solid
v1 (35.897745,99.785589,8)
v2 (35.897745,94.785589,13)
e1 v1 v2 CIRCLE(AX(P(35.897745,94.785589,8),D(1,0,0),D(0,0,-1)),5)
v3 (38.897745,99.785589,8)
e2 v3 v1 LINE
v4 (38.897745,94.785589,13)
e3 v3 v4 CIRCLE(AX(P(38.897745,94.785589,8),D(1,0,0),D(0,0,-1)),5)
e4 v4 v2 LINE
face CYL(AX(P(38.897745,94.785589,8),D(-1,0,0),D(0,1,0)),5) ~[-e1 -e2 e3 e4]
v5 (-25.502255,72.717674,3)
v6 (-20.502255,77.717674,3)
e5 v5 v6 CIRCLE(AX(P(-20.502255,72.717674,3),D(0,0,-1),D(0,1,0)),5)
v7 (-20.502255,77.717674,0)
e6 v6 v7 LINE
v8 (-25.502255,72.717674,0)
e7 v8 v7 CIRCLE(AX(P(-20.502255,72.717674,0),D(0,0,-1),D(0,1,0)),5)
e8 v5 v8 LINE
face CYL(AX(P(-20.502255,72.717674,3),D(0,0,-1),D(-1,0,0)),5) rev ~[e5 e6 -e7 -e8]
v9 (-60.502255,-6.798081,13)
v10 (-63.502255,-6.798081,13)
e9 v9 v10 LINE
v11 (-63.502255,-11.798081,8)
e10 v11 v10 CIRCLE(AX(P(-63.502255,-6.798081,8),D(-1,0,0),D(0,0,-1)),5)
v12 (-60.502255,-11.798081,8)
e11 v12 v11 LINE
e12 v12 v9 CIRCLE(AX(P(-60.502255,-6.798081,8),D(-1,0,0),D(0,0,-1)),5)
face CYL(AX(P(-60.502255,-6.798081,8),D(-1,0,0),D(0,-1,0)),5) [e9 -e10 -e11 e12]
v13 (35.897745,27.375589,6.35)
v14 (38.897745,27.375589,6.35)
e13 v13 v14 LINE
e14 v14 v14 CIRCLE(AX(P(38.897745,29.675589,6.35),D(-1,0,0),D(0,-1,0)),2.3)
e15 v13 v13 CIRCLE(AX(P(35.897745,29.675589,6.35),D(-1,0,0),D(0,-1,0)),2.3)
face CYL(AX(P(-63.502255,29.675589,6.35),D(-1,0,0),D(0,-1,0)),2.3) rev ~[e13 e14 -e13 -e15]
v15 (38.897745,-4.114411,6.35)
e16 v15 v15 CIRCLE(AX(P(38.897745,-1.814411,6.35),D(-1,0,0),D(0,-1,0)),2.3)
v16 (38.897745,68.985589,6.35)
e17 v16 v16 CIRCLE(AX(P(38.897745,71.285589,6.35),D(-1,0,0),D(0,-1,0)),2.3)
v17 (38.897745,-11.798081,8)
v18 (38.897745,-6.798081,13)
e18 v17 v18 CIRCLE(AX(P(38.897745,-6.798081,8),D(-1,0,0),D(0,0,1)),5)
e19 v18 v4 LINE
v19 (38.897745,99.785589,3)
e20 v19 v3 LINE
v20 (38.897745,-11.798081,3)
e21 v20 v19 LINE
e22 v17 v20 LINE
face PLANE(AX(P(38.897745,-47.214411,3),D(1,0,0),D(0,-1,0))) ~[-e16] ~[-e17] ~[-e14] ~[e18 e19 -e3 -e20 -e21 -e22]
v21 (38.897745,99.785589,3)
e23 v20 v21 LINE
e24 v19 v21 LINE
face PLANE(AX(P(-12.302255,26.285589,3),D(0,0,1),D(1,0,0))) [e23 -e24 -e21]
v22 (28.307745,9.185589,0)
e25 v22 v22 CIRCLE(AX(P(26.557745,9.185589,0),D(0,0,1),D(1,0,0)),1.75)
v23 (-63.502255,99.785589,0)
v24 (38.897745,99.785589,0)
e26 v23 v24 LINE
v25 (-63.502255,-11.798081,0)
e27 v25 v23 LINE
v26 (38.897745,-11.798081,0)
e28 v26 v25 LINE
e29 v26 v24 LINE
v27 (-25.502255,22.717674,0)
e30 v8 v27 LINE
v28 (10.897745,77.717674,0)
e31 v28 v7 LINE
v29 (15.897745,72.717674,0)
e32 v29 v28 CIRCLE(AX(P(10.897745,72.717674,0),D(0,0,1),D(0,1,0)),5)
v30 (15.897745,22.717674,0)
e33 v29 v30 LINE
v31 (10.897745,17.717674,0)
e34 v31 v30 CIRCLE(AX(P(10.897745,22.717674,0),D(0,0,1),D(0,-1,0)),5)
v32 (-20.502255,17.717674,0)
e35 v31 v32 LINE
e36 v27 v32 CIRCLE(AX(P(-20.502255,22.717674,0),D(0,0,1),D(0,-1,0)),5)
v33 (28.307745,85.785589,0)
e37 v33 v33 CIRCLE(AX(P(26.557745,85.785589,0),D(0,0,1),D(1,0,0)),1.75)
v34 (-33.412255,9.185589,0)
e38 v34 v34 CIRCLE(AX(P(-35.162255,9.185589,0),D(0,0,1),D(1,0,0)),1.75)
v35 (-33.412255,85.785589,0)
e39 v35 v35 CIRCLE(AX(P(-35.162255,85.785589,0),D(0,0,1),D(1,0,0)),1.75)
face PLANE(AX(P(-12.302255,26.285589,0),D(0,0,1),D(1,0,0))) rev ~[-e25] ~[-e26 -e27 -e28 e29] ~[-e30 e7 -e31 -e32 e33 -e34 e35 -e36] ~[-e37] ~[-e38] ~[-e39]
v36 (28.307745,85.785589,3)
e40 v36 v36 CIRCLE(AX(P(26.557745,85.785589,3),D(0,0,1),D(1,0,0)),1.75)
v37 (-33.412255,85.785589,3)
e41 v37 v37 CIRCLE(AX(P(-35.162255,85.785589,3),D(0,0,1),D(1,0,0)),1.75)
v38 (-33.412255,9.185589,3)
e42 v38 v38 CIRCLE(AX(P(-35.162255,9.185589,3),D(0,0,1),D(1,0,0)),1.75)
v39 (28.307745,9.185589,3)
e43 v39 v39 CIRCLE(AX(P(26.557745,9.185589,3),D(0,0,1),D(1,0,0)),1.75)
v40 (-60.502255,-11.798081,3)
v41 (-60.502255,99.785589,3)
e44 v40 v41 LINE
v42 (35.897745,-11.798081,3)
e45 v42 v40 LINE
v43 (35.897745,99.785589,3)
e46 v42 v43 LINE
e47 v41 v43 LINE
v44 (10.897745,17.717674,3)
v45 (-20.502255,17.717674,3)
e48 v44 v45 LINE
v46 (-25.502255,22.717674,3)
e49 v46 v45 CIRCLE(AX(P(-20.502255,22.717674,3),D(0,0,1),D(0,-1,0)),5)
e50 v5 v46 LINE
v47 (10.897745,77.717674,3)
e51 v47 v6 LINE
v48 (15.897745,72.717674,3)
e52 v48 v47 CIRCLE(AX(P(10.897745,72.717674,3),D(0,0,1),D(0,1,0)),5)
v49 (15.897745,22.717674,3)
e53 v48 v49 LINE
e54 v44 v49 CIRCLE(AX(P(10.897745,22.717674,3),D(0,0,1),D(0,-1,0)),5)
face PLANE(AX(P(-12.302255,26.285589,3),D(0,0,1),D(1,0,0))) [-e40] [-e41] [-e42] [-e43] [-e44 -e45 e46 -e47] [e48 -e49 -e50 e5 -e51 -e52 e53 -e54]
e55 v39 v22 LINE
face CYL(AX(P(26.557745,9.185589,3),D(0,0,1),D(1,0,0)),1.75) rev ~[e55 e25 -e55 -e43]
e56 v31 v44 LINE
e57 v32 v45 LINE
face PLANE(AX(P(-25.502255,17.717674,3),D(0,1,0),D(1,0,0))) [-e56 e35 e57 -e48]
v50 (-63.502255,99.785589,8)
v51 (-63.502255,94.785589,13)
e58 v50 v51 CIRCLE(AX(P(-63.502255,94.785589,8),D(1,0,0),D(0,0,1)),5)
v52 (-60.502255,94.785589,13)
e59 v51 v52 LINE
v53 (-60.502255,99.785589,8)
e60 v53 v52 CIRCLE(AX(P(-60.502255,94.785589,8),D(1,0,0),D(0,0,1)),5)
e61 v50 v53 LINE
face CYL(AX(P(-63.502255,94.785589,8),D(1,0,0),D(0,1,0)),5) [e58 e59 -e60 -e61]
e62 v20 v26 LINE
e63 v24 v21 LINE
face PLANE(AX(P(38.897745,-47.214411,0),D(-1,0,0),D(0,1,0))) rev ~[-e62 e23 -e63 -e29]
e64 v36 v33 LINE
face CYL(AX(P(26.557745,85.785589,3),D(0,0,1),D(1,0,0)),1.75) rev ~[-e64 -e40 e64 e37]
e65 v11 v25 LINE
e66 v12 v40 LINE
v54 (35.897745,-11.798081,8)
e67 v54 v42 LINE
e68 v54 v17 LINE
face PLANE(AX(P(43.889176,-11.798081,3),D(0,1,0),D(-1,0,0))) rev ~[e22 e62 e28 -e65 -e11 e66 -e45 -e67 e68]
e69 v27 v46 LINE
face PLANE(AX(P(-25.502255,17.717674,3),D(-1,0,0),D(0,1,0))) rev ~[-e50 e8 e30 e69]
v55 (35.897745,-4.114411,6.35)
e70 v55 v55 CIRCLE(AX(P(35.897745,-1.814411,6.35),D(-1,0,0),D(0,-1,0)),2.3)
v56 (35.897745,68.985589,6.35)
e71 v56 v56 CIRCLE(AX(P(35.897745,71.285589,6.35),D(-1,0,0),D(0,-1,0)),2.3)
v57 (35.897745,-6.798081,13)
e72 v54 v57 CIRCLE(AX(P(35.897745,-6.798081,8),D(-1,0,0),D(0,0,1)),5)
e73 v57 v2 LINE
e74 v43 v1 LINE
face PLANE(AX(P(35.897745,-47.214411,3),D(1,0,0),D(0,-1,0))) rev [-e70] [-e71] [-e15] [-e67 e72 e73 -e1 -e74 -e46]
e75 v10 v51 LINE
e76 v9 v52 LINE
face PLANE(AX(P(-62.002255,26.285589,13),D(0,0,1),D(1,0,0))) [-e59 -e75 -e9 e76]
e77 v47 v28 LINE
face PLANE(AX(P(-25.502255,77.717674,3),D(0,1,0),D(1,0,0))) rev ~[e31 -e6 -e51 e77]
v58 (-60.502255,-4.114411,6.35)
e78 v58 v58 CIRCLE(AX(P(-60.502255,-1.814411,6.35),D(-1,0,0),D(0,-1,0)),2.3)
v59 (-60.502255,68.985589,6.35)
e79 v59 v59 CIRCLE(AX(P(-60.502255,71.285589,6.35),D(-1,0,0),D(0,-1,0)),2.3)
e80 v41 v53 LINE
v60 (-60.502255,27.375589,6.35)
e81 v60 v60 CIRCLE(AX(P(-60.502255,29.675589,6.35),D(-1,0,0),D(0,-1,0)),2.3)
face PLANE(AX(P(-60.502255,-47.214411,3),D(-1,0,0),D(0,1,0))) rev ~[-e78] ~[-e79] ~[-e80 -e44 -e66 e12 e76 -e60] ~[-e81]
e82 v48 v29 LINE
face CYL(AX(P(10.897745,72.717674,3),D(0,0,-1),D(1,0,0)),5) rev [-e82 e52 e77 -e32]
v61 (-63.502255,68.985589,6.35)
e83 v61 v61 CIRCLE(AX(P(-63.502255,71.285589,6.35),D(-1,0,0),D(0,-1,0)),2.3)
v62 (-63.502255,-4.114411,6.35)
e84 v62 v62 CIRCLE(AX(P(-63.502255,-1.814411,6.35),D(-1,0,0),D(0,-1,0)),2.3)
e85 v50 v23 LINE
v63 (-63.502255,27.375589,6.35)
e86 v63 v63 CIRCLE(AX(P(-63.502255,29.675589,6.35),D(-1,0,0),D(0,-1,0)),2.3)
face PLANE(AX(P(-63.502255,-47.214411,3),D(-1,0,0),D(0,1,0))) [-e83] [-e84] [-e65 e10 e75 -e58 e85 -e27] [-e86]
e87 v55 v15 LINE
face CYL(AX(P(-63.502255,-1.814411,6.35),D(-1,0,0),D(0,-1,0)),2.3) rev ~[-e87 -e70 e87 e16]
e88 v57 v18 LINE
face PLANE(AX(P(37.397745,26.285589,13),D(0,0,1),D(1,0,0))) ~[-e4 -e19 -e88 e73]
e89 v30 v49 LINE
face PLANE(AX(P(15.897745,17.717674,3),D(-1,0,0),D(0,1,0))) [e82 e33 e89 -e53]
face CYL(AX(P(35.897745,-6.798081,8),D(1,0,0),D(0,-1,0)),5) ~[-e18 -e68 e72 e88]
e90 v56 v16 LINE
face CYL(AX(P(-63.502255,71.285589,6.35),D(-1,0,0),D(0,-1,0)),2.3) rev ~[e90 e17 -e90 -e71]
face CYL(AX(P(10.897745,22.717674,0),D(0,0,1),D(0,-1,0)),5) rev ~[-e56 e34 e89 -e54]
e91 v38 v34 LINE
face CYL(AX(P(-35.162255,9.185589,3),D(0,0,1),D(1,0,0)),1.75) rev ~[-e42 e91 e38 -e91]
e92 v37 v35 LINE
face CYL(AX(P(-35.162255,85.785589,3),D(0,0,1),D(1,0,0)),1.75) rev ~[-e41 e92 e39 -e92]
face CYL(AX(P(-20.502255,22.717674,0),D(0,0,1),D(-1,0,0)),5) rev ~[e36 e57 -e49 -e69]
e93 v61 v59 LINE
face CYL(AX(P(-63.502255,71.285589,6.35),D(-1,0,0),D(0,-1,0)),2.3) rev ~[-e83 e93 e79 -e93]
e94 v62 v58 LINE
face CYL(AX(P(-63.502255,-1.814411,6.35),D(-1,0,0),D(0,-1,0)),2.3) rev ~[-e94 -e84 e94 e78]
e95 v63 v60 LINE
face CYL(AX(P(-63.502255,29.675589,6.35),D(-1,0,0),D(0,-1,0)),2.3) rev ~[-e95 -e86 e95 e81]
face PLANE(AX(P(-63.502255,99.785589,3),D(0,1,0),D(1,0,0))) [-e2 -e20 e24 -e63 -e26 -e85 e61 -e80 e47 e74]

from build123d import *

# Parameters (mm, degrees)
F0_W      = 102.4
F0_H      = 147
F1_DEPTH  = 3
F2_W      = 3
F2_H      = 147
F3_DEPTH  = 10
F5_R      = 2.3
F6_DEPTH  = 102.401
F7_R      = 1.75
F8_DEPTH  = 3.001
F9_W      = 41.4
F9_H      = 60
F9_W_2    = 96.3999993775
F9_H_2    = 35.4163302109
F10_DEPTH = 12.5
F11_R     = 5


# Not quite as in the source:
# - a pattern or mirror of a feature is missing from the dataset's text; its kind, count and spacing are read off the source's solid
# - a feature names something its author has since deleted; it is built from what else it names


with BuildPart() as f1:
    # F0 (on Top) → F1 (new body)
    with BuildSketch(Plane.XY):
        with Locations((-12.3022546887, 26.2855888009)):
            Rectangle(F0_W, F0_H)
    extrude(amount=F1_DEPTH)

    # F2 (on face) → F3 (join)
    with BuildSketch(Plane.XY.offset(3)):
        with Locations((-62.0022546887, 26.2855888009)):
            Rectangle(F2_W, F2_H)
    f3 = extrude(amount=F3_DEPTH)

    # F3_copies: F3 across plane
    add(f3.mirror(Plane(origin=(-12.302255, 0, 0), x_dir=(0, 0, 1), z_dir=(1, 0, 0))))

    # F5 (on face) → F6 (cut, through all)
    with BuildSketch(Plane(origin=(-63.5022546887, 0, 0), x_dir=(0, -1, 0), z_dir=(-1, 0, 0))):
        with Locations((1.8144111991, 6.35)):
            Circle(F5_R)
        with Locations((-29.6755888009, 6.35)):
            Circle(F5_R)
        with Locations((-71.2855888009, 6.35)):
            Circle(F5_R)
    extrude(amount=-F6_DEPTH, mode=Mode.SUBTRACT)

    # F7 (on face) → F8 (cut, through all)
    with BuildSketch(Plane.XY.offset(3)):
        with Locations((26.5577453113, 9.1855888009)):
            Circle(F7_R)
        with Locations((-35.1622546887, 9.1855888009)):
            Circle(F7_R)
        with Locations((-35.1622546887, 85.7855888009)):
            Circle(F7_R)
        with Locations((26.5577453113, 85.7855888009)):
            Circle(F7_R)
    extrude(amount=-F8_DEPTH, mode=Mode.SUBTRACT)

    # F9 (on face) → F10 (cut, symmetric)
    with BuildSketch(Plane.XY.offset(3)):
        with Locations((-4.8022546887, 47.7176743746)):
            Rectangle(F9_W, F9_H)
        with Locations((-12.302255, -29.5062460937)):
            Rectangle(F9_W_2, F9_H_2)
        Polygon((-71.4376792312, -51.2489080429), (43.8891761005, -51.2489080429), (43.8891761005, -11.7980809882), (35.8977446887, -11.7980809882), (35.8977446887, -47.2144111991), (-60.5022546887, -47.2144111991), (-60.5022546887, -11.7980809882), (-71.4376792312, -11.7980809882), align=None)
    extrude(amount=F10_DEPTH, both=True, mode=Mode.SUBTRACT)

    # F11
    f11_edges = [f1.edges().sort_by_distance(p)[0] for p in [
        (-62.002255, 99.785589, 13),
        (-62.002255, -11.798081, 13),
        (15.897745, 17.717674, 1.5),
        (-25.502255, 17.717674, 1.5),
        (-25.502255, 77.717674, 1.5),
        (15.897745, 77.717674, 1.5),
        (37.397745, 99.785589, 13),
        (37.397745, -11.798081, 13),
    ]]
    fillet(f11_edges, radius=F11_R)


solid = f1.part
